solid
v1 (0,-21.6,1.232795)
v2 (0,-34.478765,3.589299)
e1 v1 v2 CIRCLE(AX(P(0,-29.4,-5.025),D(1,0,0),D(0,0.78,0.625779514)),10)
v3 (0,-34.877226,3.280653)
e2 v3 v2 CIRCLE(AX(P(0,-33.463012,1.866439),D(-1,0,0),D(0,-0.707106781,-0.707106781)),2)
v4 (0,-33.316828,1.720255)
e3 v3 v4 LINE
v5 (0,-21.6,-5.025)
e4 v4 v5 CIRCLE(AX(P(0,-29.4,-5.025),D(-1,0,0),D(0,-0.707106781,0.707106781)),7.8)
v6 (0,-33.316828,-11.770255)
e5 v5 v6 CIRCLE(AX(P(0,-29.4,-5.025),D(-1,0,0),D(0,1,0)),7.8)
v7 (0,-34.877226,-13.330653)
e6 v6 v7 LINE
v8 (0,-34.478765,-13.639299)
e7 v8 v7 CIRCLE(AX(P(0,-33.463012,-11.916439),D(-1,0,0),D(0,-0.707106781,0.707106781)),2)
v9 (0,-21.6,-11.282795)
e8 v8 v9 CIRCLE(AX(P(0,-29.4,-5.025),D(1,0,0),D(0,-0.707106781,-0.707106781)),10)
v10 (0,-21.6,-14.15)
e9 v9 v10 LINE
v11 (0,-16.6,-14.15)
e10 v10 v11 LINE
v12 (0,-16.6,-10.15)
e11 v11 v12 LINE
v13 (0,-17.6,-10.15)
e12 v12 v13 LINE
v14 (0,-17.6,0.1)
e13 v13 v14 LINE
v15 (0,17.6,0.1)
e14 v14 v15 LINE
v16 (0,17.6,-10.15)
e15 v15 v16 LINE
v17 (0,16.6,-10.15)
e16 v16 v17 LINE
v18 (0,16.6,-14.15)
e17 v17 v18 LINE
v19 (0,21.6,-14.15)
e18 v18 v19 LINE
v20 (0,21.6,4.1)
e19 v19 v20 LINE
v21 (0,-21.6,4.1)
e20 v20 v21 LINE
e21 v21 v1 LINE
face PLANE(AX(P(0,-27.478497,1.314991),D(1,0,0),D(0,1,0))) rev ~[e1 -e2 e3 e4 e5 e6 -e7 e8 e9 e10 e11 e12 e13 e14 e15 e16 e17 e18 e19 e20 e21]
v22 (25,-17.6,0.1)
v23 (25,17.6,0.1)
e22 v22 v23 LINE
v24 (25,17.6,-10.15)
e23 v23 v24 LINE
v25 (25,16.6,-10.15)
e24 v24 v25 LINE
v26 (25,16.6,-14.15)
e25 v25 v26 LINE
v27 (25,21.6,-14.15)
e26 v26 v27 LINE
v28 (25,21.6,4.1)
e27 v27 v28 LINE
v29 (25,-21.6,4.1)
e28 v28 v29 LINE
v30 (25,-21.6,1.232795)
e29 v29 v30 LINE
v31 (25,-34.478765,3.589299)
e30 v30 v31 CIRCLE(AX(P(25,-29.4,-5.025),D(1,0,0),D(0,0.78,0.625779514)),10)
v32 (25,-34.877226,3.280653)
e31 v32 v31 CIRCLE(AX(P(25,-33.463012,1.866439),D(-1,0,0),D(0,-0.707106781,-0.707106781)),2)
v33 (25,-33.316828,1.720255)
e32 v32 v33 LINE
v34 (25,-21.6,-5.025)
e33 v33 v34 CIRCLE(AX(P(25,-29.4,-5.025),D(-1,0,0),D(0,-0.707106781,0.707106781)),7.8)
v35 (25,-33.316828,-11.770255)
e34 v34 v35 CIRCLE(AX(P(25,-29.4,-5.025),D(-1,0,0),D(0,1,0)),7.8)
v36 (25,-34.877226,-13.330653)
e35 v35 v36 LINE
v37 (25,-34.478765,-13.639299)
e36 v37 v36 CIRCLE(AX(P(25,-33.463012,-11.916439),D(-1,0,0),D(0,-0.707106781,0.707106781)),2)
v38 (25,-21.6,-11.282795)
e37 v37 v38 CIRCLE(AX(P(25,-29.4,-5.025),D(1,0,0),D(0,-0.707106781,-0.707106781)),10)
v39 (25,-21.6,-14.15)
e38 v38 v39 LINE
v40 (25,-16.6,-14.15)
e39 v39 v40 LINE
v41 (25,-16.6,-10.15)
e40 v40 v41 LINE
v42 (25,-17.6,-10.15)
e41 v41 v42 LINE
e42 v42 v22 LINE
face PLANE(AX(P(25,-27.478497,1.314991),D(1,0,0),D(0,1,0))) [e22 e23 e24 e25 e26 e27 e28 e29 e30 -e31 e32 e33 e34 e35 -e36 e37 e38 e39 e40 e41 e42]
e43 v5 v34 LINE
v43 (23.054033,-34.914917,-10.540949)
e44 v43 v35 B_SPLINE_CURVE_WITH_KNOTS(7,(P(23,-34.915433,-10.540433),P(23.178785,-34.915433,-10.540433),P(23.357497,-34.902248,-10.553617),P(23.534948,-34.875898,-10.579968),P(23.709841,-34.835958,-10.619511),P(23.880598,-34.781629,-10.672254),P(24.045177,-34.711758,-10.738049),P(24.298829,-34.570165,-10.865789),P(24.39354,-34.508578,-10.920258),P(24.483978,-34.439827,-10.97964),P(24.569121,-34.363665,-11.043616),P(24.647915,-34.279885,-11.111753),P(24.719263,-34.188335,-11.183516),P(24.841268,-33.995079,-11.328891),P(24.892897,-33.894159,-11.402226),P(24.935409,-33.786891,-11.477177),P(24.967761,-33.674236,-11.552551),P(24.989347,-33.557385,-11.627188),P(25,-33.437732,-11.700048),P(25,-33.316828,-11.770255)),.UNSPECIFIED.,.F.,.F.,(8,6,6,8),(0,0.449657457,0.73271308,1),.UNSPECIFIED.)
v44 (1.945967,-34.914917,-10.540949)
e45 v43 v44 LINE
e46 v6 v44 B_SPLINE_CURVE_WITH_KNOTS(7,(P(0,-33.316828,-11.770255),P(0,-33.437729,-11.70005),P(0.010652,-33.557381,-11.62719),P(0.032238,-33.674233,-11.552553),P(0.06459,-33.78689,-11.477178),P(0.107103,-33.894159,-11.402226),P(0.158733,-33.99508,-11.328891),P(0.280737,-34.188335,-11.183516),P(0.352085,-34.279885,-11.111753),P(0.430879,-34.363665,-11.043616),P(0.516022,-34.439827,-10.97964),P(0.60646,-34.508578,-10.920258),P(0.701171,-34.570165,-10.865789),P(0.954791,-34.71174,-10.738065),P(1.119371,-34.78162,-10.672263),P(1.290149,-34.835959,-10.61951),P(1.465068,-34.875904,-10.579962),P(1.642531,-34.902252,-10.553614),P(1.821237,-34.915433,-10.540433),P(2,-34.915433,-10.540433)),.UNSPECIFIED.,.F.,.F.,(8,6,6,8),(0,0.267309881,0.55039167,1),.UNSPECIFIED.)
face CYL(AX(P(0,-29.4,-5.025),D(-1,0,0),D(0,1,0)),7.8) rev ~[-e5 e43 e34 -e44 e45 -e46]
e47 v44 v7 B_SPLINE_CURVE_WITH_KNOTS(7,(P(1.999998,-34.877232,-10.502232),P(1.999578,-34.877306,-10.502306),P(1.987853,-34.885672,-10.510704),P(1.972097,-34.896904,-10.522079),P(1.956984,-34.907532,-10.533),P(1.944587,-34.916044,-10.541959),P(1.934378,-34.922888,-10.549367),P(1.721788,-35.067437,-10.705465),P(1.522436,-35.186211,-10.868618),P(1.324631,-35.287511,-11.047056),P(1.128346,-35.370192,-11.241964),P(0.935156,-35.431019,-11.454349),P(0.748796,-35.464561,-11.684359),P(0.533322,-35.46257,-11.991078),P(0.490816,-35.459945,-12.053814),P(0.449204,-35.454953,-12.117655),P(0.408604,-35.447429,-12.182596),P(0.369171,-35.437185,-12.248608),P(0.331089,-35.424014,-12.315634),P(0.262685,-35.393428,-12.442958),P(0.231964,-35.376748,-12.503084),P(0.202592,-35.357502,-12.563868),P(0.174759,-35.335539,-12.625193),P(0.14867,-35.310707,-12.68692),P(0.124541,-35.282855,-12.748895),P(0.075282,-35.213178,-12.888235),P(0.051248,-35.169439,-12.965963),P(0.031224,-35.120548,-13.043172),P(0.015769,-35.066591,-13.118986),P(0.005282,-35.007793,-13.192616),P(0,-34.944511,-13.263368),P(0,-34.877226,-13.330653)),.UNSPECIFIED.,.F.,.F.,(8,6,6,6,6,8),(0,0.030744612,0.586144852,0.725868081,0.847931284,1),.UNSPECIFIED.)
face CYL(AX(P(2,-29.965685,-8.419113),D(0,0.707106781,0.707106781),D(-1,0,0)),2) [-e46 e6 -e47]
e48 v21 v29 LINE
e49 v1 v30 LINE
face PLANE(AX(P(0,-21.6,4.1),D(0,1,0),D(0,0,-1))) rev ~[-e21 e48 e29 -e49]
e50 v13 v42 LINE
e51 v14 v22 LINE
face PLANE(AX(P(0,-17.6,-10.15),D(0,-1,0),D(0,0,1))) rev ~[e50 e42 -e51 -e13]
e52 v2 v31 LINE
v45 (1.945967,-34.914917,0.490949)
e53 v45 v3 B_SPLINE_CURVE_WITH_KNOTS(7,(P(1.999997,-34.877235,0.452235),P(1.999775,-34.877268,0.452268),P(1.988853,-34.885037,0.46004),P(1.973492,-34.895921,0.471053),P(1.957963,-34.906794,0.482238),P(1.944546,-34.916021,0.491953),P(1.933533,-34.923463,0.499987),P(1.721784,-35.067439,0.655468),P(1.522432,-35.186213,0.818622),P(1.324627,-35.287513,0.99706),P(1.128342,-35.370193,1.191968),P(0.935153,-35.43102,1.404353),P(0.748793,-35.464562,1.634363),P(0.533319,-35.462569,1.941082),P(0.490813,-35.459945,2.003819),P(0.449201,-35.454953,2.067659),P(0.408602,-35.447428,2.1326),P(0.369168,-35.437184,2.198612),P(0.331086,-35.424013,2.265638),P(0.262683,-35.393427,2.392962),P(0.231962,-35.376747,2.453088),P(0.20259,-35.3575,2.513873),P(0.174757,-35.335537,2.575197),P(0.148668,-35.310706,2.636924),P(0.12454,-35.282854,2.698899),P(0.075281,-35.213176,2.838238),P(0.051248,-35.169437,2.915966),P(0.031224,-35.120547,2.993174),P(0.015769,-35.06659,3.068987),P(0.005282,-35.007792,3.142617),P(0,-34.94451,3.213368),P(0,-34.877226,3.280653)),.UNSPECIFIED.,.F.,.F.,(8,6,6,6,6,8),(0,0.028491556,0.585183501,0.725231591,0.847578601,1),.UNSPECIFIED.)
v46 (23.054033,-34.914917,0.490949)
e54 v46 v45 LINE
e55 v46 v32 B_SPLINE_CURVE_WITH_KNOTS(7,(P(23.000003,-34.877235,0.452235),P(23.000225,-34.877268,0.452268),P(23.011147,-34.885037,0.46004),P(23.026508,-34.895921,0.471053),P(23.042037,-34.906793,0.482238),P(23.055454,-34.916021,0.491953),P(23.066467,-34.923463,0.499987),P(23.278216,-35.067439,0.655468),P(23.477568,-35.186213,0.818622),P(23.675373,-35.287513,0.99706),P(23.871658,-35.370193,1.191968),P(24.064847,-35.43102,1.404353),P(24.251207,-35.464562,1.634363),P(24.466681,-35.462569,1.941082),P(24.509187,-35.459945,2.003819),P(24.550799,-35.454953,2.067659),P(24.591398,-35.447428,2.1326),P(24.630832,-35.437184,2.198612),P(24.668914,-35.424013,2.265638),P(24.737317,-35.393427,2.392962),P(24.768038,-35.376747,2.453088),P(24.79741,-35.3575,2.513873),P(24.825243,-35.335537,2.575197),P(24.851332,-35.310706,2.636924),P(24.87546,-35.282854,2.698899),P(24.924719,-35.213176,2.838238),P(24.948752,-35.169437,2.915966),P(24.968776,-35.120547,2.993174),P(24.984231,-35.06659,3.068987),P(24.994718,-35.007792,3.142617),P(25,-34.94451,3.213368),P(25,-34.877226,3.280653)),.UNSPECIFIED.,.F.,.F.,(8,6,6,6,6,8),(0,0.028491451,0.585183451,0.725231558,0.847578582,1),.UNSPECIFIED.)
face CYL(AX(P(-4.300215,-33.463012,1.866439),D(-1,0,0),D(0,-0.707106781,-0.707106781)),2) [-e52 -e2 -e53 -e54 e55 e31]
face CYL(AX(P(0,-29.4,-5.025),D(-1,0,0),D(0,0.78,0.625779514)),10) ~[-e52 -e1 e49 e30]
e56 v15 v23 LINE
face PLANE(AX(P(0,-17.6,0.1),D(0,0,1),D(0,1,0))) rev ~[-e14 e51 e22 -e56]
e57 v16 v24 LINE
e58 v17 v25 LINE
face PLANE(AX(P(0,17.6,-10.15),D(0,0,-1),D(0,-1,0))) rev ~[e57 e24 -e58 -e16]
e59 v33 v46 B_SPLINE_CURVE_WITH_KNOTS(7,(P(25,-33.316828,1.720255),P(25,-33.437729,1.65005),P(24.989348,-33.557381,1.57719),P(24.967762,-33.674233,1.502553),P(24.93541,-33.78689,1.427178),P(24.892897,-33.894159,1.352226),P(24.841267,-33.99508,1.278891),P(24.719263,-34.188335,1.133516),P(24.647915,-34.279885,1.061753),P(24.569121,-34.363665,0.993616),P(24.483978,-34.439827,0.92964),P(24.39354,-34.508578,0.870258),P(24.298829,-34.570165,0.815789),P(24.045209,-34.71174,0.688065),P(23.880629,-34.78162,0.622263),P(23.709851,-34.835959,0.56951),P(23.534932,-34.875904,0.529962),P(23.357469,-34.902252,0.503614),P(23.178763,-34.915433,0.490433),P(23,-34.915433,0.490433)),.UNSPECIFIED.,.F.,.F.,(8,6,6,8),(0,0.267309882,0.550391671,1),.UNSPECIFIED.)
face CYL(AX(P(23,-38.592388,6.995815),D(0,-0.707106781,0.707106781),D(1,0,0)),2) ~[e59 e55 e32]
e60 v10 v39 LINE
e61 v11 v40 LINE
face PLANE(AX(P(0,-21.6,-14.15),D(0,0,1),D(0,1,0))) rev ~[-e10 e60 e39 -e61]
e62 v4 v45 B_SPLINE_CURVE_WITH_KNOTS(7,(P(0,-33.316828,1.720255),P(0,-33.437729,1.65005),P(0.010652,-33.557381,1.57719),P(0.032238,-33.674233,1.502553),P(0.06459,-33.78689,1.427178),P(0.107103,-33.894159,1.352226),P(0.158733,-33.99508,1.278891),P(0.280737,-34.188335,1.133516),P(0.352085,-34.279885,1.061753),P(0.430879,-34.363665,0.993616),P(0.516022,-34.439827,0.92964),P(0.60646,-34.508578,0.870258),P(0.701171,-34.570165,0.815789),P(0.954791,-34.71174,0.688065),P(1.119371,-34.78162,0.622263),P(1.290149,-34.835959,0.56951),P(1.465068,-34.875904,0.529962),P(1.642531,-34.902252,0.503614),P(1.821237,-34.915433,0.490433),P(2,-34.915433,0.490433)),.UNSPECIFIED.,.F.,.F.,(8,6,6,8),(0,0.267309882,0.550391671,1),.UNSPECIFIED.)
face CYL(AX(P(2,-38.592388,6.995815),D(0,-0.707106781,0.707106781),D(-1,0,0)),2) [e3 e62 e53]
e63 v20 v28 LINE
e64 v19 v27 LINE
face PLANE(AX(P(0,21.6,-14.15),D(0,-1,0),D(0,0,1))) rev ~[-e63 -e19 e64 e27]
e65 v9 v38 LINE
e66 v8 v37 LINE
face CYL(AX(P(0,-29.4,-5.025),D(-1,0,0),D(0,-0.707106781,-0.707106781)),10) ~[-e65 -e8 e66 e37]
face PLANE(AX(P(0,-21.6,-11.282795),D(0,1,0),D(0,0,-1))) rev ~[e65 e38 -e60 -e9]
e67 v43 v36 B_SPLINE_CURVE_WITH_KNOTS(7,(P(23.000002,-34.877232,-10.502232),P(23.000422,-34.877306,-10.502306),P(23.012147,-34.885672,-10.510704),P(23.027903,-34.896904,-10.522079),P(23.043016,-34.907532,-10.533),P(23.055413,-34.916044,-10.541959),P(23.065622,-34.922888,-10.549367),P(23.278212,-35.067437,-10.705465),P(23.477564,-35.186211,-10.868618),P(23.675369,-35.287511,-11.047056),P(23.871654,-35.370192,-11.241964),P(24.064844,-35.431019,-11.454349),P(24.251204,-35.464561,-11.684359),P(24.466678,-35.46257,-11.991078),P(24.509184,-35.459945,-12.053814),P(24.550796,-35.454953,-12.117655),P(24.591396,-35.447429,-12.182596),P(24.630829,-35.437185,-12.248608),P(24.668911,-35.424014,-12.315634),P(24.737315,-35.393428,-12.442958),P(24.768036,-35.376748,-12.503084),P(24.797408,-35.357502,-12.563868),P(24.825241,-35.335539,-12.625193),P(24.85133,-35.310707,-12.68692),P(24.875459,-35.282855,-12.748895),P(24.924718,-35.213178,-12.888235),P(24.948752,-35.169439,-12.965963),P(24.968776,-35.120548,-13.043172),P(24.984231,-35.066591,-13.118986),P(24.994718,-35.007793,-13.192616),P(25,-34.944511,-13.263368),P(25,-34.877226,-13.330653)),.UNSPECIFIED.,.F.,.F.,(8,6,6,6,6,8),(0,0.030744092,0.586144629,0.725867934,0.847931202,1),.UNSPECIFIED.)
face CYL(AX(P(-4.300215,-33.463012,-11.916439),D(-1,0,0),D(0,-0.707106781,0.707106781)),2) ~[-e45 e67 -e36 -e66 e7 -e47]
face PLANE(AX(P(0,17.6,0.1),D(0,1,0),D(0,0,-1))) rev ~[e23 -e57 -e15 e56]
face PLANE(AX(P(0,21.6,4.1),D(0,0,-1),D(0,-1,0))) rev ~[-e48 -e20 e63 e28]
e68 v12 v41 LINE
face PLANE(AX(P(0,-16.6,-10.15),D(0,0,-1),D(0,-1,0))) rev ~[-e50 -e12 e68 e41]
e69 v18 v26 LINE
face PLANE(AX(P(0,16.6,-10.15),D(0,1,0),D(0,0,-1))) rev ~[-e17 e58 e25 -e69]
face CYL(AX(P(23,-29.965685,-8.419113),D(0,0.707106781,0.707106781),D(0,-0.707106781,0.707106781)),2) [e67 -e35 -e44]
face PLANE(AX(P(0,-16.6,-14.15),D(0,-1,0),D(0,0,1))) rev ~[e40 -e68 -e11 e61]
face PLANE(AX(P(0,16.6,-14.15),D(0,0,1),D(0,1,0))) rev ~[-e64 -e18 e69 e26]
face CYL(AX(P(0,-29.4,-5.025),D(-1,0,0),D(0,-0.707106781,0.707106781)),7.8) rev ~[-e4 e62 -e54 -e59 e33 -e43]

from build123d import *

# Parameters (mm, degrees)
F1_DEPTH    = 25
F2_DEPTH    = 25
F3_T1_DEPTH = 12.2
F3_T3_DEPTH = 12.2
F3_T5_DEPTH = 12.2
F3_T7_DEPTH = 12.2
F4_T1_DEPTH = 33.6004292483


# Not quite as in the source:
# - a fillet or chamfer that OpenCascade refuses, or shapes differently, is made with other operations: its cross-section is extruded or revolved along the edge and cut away or added


with BuildPart() as f1:
    # F0 (on Right) → F1 (new body)
    with BuildSketch(Plane.YZ):
        with BuildLine():
            Line((17.6, 0.1), (17.6, -10.15))
            Line((17.6, -10.15), (16.6, -10.15))
            Line((16.6, -10.15), (16.6, -14.15))
            Line((16.6, -14.15), (21.6, -14.15))
            Line((21.6, -14.15), (21.6, 4.1))
            Line((21.6, 4.1), (0, 4.1))
            Line((0, 4.1), (-21.6, 4.1))
            Line((-21.6, 4.1), (-21.6, 1.2327951389))
            ThreePointArc((-21.6, 1.2327951389), (-19.9660188679, -1.7083752096), (-19.4, -5.025))
            ThreePointArc((-19.4, -5.025), (-19.9660188679, -8.3416247904), (-21.6, -11.2827951389))
            Line((-21.6, -11.2827951389), (-21.6, -14.15))
            Line((-21.6, -14.15), (-16.6, -14.15))
            Line((-16.6, -14.15), (-16.6, -10.15))
            Line((-16.6, -10.15), (-17.6, -10.15))
            Line((-17.6, -10.15), (-17.6, 0.1))
            Line((-17.6, 0.1), (0, 0.1))
            Line((0, 0.1), (17.6, 0.1))
        make_face()
    extrude(amount=F1_DEPTH)

    # F0 (on Right) → F2 (join)
    with BuildSketch(Plane.YZ):
        with BuildLine():
            Line((-21.6, -5.025), (-21.6, 1.2327951389))
            ThreePointArc((-21.6, 1.2327951389), (-28.8539334803, 4.9600794366), (-36.4710678119, 2.0460678119))
            Line((-36.4710678119, 2.0460678119), (-34.9154328933, 0.4904328933))
            ThreePointArc((-34.9154328933, 0.4904328933), (-26.4150692276, 2.1812603536), (-21.6, -5.025))
        make_face()
        with BuildLine():
            Line((-21.6, -11.2827951389), (-21.6, -5.025))
            ThreePointArc((-21.6, -5.025), (-26.4150692276, -12.2312603536), (-34.9154328933, -10.5404328933))
            Line((-34.9154328933, -10.5404328933), (-36.4710678119, -12.0960678119))
            ThreePointArc((-36.4710678119, -12.0960678119), (-28.8539334803, -15.0100794366), (-21.6, -11.2827951389))
        make_face()
        with BuildLine():
            ThreePointArc((-19.4, -5.025), (-19.9660188679, -1.7083752096), (-21.6, 1.2327951389))
            Line((-21.6, 1.2327951389), (-21.6, -5.025))
            Line((-21.6, -5.025), (-21.6, -11.2827951389))
            ThreePointArc((-21.6, -11.2827951389), (-19.9660188679, -8.3416247904), (-19.4, -5.025))
        make_face()
    extrude(amount=F2_DEPTH)

    # F3: fillet of radius 2 on 4 edges, made by hand

    # F3_s2 → F3_t1 (cut)
    with BuildSketch(Plane(origin=(0, -19.1923989873, -19.1923989873), x_dir=(1, 0, 0), z_dir=(0, -0.7071067812, -0.7071067812))):
        with BuildLine():
            ThreePointArc((23, 17.2357277914), (24.4142135624, 16.6499413538), (25, 15.2357277914))
            Line((25, 15.2357277914), (25, 17.2357277914))
            Line((25, 17.2357277914), (23, 17.2357277914))
        make_face()
    extrude(amount=F3_T1_DEPTH, mode=Mode.SUBTRACT)

    # F3_s4 → F3_t3 (cut)
    with BuildSketch(Plane(origin=(0, -19.1923989873, -19.1923989873), x_dir=(1, 0, 0), z_dir=(0, -0.7071067812, -0.7071067812))):
        with BuildLine():
            ThreePointArc((0, 15.2357277914), (0.5857864376, 16.6499413538), (2, 17.2357277914))
            Line((2, 17.2357277914), (0, 17.2357277914))
            Line((0, 17.2357277914), (0, 15.2357277914))
        make_face()
    extrude(amount=F3_T3_DEPTH, mode=Mode.SUBTRACT)

    # F3_s6 → F3_t5 (cut)
    with BuildSketch(Plane(origin=(0, -22.7941017178, 22.7941017178), x_dir=(1, 0, 0), z_dir=(0, 0.7071067812, -0.7071067812))):
        with BuildLine():
            ThreePointArc((25, 22.3421509423), (24.4142135624, 23.7563645047), (23, 24.3421509423))
            Line((23, 24.3421509423), (25, 24.3421509423))
            Line((25, 24.3421509423), (25, 22.3421509423))
        make_face()
    extrude(amount=F3_T5_DEPTH, mode=Mode.SUBTRACT)

    # F3_s8 → F3_t7 (cut)
    with BuildSketch(Plane(origin=(0, -22.7941017178, 22.7941017178), x_dir=(1, 0, 0), z_dir=(0, 0.7071067812, -0.7071067812))):
        with BuildLine():
            ThreePointArc((0, 22.3421509423), (0.5857864376, 23.7563645047), (2, 24.3421509423))
            Line((2, 24.3421509423), (0, 24.3421509423))
            Line((0, 24.3421509423), (0, 22.3421509423))
        make_face()
    extrude(amount=F3_T7_DEPTH, mode=Mode.SUBTRACT)

    # F4: fillet of radius 2 on 2 edges, made by hand

    # F4_s2 → F4_t1 (cut)
    with BuildSketch(Plane.YZ.offset(-4.3002146241)):
        with BuildLine():
            ThreePointArc((-34.8772255751, 0.4522255751), (-35.4470714052, 2.1184477224), (-34.4787650158, 3.5892989218))
            ThreePointArc((-34.4787650158, 3.5892989218), (-35.523724357, 2.8806941504), (-36.4710678119, 2.0460678119))
            Line((-36.4710678119, 2.0460678119), (-34.8772255751, 0.4522255751))
        make_face()
        with BuildLine():
            ThreePointArc((-34.8772255751, -10.5022255751), (-35.4470714052, -12.1684477224), (-34.4787650158, -13.6392989218))
            ThreePointArc((-34.4787650158, -13.6392989218), (-35.523724357, -12.9306941504), (-36.4710678119, -12.0960678119))
            Line((-36.4710678119, -12.0960678119), (-34.8772255751, -10.5022255751))
        make_face()
    extrude(amount=F4_T1_DEPTH, mode=Mode.SUBTRACT)


solid = f1.part
